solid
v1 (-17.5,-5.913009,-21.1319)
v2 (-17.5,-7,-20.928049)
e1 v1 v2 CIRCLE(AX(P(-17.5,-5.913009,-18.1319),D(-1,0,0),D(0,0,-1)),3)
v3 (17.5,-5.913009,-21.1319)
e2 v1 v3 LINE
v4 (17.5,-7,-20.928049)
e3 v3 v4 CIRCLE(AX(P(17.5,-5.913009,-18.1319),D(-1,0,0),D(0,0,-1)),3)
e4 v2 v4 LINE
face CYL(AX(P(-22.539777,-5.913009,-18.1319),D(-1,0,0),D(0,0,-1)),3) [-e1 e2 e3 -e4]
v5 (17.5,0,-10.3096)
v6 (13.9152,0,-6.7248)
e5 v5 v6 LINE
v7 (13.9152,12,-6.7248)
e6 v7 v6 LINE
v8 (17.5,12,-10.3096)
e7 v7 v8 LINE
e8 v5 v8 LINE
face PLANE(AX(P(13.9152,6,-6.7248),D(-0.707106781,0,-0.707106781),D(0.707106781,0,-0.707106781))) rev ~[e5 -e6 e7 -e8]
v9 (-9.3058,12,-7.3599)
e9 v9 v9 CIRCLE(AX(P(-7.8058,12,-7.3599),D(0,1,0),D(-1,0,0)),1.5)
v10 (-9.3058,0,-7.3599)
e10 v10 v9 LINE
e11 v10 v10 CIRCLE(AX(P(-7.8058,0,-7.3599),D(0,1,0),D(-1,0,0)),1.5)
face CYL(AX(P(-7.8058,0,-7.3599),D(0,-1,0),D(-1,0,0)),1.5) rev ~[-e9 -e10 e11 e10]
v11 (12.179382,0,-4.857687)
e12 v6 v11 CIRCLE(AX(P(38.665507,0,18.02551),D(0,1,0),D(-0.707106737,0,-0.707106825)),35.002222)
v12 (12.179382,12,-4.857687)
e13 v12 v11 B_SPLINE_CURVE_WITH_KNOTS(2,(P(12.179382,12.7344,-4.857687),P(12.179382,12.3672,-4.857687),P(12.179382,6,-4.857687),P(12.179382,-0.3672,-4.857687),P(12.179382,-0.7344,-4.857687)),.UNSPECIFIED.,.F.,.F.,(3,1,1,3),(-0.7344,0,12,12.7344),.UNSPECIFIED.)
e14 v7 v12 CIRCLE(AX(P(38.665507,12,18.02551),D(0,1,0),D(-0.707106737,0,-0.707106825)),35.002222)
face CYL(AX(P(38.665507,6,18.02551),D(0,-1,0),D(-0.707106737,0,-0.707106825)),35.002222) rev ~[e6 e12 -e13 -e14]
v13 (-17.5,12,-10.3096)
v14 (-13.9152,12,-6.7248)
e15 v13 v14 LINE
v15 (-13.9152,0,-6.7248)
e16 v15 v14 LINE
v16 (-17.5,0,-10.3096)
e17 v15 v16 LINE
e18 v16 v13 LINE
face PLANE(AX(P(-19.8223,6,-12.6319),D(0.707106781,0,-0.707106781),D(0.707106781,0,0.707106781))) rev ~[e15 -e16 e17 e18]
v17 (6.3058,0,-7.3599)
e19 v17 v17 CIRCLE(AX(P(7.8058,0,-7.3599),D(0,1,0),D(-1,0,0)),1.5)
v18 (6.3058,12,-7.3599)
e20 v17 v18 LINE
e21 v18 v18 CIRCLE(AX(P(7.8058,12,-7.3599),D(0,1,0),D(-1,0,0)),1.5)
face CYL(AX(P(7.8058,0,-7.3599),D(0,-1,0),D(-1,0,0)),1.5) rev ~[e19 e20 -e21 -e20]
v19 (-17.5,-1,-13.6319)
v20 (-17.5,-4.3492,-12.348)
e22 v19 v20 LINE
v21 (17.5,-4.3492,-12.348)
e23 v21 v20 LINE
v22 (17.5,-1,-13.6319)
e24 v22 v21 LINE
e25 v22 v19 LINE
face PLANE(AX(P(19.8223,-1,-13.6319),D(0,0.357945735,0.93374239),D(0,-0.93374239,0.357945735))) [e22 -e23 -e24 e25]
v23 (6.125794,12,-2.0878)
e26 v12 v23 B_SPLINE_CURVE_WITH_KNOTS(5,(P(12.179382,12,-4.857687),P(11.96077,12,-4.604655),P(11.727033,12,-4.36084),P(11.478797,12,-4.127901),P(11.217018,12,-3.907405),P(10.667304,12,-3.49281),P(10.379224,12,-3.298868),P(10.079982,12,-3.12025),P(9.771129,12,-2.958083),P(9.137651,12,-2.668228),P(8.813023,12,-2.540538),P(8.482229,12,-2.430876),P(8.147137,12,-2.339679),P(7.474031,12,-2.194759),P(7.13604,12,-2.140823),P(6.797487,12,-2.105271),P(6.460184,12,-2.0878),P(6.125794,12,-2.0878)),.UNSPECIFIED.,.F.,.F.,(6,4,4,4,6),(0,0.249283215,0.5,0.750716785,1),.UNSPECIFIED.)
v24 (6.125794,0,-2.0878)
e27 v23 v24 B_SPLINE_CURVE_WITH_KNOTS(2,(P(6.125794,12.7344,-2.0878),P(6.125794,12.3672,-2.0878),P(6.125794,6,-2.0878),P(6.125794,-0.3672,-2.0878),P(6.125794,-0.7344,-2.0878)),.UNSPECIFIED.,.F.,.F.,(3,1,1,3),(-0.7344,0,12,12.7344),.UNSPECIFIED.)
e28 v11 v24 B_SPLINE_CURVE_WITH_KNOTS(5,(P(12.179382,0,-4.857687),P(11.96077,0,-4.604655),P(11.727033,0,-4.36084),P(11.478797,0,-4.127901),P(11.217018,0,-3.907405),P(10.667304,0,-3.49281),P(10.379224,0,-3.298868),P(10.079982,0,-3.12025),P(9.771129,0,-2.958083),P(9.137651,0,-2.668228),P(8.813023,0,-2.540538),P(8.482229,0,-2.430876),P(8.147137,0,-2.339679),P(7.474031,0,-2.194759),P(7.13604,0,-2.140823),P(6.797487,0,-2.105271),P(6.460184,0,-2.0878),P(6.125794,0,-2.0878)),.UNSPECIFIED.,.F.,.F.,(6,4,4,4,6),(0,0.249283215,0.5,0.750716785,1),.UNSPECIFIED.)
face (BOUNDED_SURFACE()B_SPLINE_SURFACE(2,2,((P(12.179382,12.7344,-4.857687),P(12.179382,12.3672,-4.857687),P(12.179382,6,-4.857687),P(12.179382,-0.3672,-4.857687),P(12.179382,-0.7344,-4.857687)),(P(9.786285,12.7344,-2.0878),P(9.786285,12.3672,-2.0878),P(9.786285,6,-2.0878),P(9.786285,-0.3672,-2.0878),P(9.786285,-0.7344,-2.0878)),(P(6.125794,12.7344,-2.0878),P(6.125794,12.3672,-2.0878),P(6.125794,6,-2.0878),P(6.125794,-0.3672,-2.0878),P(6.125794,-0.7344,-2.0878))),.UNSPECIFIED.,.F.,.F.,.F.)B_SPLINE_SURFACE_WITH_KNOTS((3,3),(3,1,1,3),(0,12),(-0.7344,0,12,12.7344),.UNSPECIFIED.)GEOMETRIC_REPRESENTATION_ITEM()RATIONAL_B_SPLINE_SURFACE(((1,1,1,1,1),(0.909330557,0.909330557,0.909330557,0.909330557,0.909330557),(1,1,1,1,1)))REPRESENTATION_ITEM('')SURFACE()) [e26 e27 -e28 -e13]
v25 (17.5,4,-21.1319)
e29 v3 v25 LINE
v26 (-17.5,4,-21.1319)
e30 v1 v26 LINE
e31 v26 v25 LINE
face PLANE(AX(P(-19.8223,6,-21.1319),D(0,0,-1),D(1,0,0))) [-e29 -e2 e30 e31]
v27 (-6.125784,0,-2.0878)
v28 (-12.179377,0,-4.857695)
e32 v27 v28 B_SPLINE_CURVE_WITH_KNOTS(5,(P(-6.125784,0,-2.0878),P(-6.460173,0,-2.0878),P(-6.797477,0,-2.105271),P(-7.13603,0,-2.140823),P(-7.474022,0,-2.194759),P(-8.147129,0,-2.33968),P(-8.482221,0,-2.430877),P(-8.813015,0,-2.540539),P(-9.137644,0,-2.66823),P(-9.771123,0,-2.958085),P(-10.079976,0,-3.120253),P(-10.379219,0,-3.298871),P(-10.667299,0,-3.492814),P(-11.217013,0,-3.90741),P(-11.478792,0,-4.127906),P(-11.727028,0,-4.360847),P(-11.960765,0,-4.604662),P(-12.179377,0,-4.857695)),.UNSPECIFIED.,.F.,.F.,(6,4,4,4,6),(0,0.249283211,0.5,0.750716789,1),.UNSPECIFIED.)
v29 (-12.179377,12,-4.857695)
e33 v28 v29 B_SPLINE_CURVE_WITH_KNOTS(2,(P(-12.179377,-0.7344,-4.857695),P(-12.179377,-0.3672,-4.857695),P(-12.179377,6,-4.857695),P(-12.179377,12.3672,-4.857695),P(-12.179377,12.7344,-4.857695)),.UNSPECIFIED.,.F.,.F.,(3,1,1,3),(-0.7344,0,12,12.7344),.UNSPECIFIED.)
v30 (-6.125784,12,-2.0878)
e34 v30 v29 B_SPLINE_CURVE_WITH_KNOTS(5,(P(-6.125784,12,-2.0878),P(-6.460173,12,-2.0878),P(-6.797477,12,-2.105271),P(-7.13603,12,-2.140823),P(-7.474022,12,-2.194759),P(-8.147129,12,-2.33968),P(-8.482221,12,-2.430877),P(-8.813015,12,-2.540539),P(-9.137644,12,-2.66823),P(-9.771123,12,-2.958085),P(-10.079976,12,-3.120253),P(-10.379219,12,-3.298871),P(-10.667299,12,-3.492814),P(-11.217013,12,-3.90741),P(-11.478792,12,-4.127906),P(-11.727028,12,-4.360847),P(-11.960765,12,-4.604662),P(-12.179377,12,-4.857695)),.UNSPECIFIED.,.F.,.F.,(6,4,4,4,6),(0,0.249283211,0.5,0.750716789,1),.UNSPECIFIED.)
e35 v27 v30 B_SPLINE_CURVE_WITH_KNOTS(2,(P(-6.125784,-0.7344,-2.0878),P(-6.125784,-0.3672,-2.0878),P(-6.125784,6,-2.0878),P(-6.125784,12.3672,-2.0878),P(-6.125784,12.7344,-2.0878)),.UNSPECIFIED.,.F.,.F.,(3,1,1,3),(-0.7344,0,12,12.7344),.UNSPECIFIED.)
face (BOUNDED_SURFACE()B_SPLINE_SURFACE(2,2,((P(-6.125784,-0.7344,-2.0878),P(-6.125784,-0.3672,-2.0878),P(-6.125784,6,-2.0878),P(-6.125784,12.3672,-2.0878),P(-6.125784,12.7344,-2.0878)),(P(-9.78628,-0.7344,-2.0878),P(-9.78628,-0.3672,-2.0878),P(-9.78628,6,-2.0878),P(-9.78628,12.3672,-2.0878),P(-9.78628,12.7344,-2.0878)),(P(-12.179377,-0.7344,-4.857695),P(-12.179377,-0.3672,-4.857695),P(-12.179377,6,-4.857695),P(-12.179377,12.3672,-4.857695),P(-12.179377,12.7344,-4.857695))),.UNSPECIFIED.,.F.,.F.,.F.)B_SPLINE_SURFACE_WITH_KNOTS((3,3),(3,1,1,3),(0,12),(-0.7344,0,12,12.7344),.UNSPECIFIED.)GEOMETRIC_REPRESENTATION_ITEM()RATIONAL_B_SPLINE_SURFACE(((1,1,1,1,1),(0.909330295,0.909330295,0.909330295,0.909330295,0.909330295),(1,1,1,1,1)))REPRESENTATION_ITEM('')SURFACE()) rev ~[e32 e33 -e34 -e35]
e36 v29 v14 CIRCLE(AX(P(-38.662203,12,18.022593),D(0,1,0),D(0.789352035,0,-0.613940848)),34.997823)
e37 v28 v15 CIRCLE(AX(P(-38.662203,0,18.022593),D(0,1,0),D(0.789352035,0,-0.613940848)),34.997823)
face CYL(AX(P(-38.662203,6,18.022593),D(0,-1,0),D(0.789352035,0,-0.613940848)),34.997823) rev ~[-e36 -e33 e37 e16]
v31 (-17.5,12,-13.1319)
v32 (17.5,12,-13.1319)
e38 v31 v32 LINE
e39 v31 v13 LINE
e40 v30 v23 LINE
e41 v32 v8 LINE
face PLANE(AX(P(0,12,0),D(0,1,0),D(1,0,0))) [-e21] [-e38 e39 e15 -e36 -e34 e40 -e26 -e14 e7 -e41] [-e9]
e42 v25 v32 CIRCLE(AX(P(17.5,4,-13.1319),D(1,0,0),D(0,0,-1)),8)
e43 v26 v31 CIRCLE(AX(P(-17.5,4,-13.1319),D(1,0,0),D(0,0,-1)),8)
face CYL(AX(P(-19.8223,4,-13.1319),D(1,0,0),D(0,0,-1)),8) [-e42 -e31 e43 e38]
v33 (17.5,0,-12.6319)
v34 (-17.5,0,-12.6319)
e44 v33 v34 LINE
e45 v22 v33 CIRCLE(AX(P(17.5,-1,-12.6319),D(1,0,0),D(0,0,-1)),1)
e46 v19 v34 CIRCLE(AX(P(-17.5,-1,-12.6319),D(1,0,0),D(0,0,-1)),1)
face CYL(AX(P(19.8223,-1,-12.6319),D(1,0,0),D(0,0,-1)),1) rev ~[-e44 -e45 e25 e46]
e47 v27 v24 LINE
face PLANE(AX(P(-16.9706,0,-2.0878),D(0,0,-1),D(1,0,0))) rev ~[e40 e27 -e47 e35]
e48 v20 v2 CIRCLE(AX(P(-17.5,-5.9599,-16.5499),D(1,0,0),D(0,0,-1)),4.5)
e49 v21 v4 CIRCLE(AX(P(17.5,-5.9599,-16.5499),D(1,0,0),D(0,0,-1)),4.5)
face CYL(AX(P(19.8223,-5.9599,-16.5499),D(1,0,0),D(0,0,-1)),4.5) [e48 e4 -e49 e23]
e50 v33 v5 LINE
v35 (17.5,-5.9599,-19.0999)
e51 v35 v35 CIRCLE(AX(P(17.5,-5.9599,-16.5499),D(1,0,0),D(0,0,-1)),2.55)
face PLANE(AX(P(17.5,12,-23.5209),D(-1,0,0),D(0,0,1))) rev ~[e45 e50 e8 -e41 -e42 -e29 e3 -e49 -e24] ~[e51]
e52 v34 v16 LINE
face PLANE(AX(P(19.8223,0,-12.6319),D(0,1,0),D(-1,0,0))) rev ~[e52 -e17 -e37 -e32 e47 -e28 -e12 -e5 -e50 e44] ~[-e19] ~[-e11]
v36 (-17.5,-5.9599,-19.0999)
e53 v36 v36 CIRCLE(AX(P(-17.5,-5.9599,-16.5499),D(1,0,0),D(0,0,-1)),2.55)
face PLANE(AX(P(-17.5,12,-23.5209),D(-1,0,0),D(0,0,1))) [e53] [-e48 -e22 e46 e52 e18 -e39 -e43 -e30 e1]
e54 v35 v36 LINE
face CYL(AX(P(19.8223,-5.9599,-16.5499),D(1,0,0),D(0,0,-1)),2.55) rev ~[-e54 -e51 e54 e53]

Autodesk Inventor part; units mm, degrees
ref_plane "YZ Plane" through (0, 0, 0) normal (1, 0, 0) x (0, 1, 0)
ref_plane "XZ Plane" through (0, 0, 0) normal (0, 1, 0) x (-1, 0, 0)
ref_plane "XY Plane" through (0, 0, 0) normal (0, 0, 1) x (1, 0, 0)
sketch "Sketch1" plane through (0, 0, 0) normal (0, 1, 0) x (-1, 0, 0)
  circle A0 centre (-30, -5.1319) radius 1.5
  arc A1 (-31.1155, 2.2846) -> (-30, -12.6319) centre (-30, -5.1319) ccw
  arc A2 (-30, -12.6319) -> (-31.1155, 2.2846) centre (-30, -5.1319) ccw construction
  circle A3 centre (-16.9706, -0.5878) radius 1.5
  circle A4 centre (16.9706, -0.5878) radius 1.5
  circle A5 centre (16.9706, -0.5878) radius 5 construction
  line L0 (-16.9706, 4.4122) -> (-31.1155, 2.2846)
  circle A6 centre (-16.9706, -0.5878) radius 5 construction
  circle A7 centre (-7.8058, -8.4213) radius 1.55
  line L1 (0, -8.4213) -> (-15.6117, -8.4213) construction
  circle A8 centre (0, 0) radius 1.55
  line L2 (-16.9706, 4.4122) -> (16.9706, 4.4122)
  line L3 (30, -12.6319) -> (-30, -12.6319)
  circle A9 centre (30, -5.1319) radius 1.5
  line L4 (0, 4.2106) -> (0, -4.2106) construction
  line L5 (0, -4.2106) -> (0, -12.6319) construction
  line L6 (0, -4.2106) -> (3.1574, -4.2106) construction
  line L7 (0, -8.4213) -> (15.6117, -8.4213) construction
  line L8 (16.9706, 4.4122) -> (31.1155, 2.2846)
  arc A10 (31.1155, 2.2846) -> (30, -12.6319) centre (30, -5.1319) ccw construction
  arc A11 (30, -12.6319) -> (31.1155, 2.2846) centre (30, -5.1319) ccw
  circle A12 centre (7.8058, -8.4213) radius 1.55
  point P0 (0, 0)
  point P1 (0, 0)
  dimension "d0" = 10
  dimension "d1" = 10
  dimension "d2" = 15
  dimension "d3" = 15
  dimension "d4" = 3.1
  dimension "d5" = 3.1
  dimension "d6" = 3.1
sketch "Sketch2" plane through (0, 0, 0) normal (0, 1, 0) x (-1, 0, 0)
  circle A0 centre (15, 9.8681) radius 3
  circle A1 centre (16.9706, -0.5878) radius 1.5
  arc A2 (3.1574, 6.6664) -> (-3.1574, 6.6664) centre (0, 4.2106) ccw
  line L0 (3.1574, 6.6664) -> (11.0366, -3.464)
  arc A3 (11.0366, -3.464) -> (13.9152, -6.7248) centre (38.6639, 18.024) ccw
  line L1 (13.9152, -6.7248) -> (21.1612, -13.9708)
  arc A4 (30.0072, 37.5736) -> (30.286, 34.6489) centre (32.7505, 36.3595) ccw
  arc A5 (35.8309, 43.8114) -> (30.0072, 37.5736) centre (41.895, 32.3124) ccw
  circle A6 centre (25.4558, 41.8386) radius 1.5
  circle A7 centre (30, 54.8681) radius 1.5
  circle A8 centre (16.9706, 50.3239) radius 1.5
  circle A9 centre (15, 39.8681) radius 3
  circle A10 centre (24.2029, 72.4055) radius 1.5
  line L2 (27.7949, 74.3102) -> (17.0958, 107.9924)
  arc A11 (17.0958, 107.9924) -> (14.6505, 110.5406) centre (13.2835, 106.7814) ccw
  circle A12 centre (13.2835, 106.7814) radius 1.5
  line L3 (14.6505, 110.5406) -> (2.0505, 115.1224)
  circle A13 centre (-24.2029, 72.4055) radius 1.5
  arc A14 (2.0505, 115.1224) -> (-2.0505, 115.1224) centre (0, 109.4837) ccw
  line L4 (-17.0958, 107.9924) -> (-27.7949, 74.3102)
  circle A15 centre (-13.2835, 106.7814) radius 1.5
  arc A16 (-14.6505, 110.5406) -> (-17.0958, 107.9924) centre (-13.2835, 106.7814) ccw
  line L5 (-2.0505, 115.1224) -> (-14.6505, 110.5406)
  line L6 (-25.5, 17.3681) -> (-25.5, 32.3681)
  line L7 (-28.5, 32.3681) -> (-28.5, 17.3681)
  line L8 (-31, 32.3681) -> (-31, 17.3681)
  arc A17 (-28.5, 17.3681) -> (-25.5, 17.3681) centre (-27, 17.3681) ccw
  arc A18 (-31, 17.3681) -> (-30.286, 15.0873) centre (-27, 17.3681) ccw
  arc A19 (-30.0072, 37.5736) -> (-35.8309, 43.8114) centre (-41.895, 32.3124) ccw
  arc A20 (-25.5, 32.3681) -> (-28.5, 32.3681) centre (-27, 32.3681) ccw
  arc A21 (-30.286, 34.6489) -> (-31, 32.3681) centre (-27, 32.3681) ccw
  arc A22 (-30.286, 34.6489) -> (-30.0072, 37.5736) centre (-32.7505, 36.3595) ccw
  circle A23 centre (-25.4558, 41.8386) radius 1.5
  circle A24 centre (-15, 39.8681) radius 3
  circle A25 centre (-16.9706, 50.3239) radius 1.5
  arc A26 (-30.0072, 12.1625) -> (-30.286, 15.0873) centre (-32.7505, 13.3766) ccw
  arc A27 (-35.8309, 5.9248) -> (-30.0072, 12.1625) centre (-41.895, 17.4238) ccw
  arc A28 (-35.8309, 5.9248) -> (-21.1612, -13.9708) centre (-30, -5.1319) ccw
  line L9 (-21.1612, -13.9708) -> (-13.9152, -6.7248)
  circle A29 centre (-15, 9.8681) radius 3
  circle A30 centre (-25.4558, 7.8975) radius 1.5
  circle A31 centre (-16.9706, -0.5878) radius 1.5
  circle A32 centre (-30, -5.1319) radius 1.5
  line L10 (-11.0366, -3.464) -> (-3.1574, 6.6664)
  arc A33 (-13.9152, -6.7248) -> (-11.0366, -3.464) centre (-38.6639, 18.024) ccw
  line L11 (31, 17.3681) -> (31, 32.3681)
  arc A34 (28.5, 32.3681) -> (25.5, 32.3681) centre (27, 32.3681) ccw
  line L12 (25.5, 32.3681) -> (25.5, 17.3681)
  line L13 (28.5, 17.3681) -> (28.5, 32.3681)
  arc A35 (31, 32.3681) -> (30.286, 34.6489) centre (27, 32.3681) ccw
  arc A36 (-34.9925, 66.3278) -> (-27.7949, 74.3102) centre (-40.1848, 78.2458) ccw
  arc A37 (-34.9925, 66.3278) -> (-35.8309, 43.8114) centre (-30, 54.8681) ccw
  circle A38 centre (-30, 54.8681) radius 1.5
  arc A39 (30.0072, 12.1625) -> (35.8309, 5.9248) centre (41.895, 17.4238) ccw
  circle A40 centre (30, -5.1319) radius 1.5
  arc A41 (21.1612, -13.9708) -> (35.8309, 5.9248) centre (30, -5.1319) ccw
  circle A42 centre (25.4558, 7.8975) radius 1.5
  arc A43 (25.5, 17.3681) -> (28.5, 17.3681) centre (27, 17.3681) ccw
  arc A44 (30.286, 15.0873) -> (30.0072, 12.1625) centre (32.7505, 13.3766) ccw
  arc A45 (30.286, 15.0873) -> (31, 17.3681) centre (27, 17.3681) ccw
  arc A46 (35.8309, 43.8114) -> (34.9925, 66.3278) centre (30, 54.8681) ccw
  arc A47 (27.7949, 74.3102) -> (34.9925, 66.3278) centre (40.1848, 78.2458) ccw
  circle A48 centre (-30, -5.1319) radius 1.5 construction
  point P0 (0, 0)
  point P1 (0, 109.4837)
sketch "Sketch3" plane through (0, 0, 0) normal (0, 1, 0) x (-1, 0, 0)
  arc A0 (3.1574, 6.6664) -> (-3.1574, 6.6664) centre (0, 4.2106) ccw projected
  line L0 (-11.0366, -3.464) -> (-3.1574, 6.6664) projected
  line L1 (3.1574, 6.6664) -> (11.0366, -3.464) projected
  arc A1 (11.0366, -3.464) -> (13.9152, -6.7248) centre (38.6639, 18.024) ccw projected
  arc A2 (-13.9152, -6.7248) -> (-11.0366, -3.464) centre (-38.6639, 18.024) ccw projected
  line L2 (-21.1612, -13.9708) -> (-13.9152, -6.7248) projected
  line L3 (13.9152, -6.7248) -> (21.1612, -13.9708) projected
  line L4 (30, -12.6319) -> (-30, -12.6319) projected
  circle A3 centre (-7.8058, -8.4213) radius 1.55 construction
  circle A4 centre (7.8058, -8.4213) radius 1.55 construction
  circle A5 centre (0, 0) radius 1.55 projected
  circle A6 centre (-16.9706, -0.5878) radius 1.5 construction
  circle A7 centre (16.9706, -0.5878) radius 1.5 construction
  line L5 (-16.9706, -2.0878) -> (16.9706, -2.0878) construction
  line L6 (7.8058, -12.6319) -> (7.8058, -2.0878) construction
  line L7 (-7.8058, -12.6319) -> (-7.8058, -2.0878) construction
  circle A8 centre (-7.8058, -7.3599) radius 1.5
  circle A9 centre (7.8058, -7.3599) radius 1.5
  line L8 (-5.032, -12.6319) -> (-5.032, -2.0878) construction
  line L9 (-5.032, -7.3599) -> (-10.6888, -7.3599) construction
  point P0 (0, 0)
  point P1 (-19.8223, -12.6319)
  point P2 (19.8223, -12.6319)
  dimension "d38" = 3
  dimension "d39" = 3
  dimension "d42" = 10.5442
extrude "Extrusion1" add sketch "Sketch3" along normal blind 6 contours L1 A1 L3 L4 L2 A2 L0 A0 | A8 | A9
sketch "Sketch4" plane through (19.8223, 0, -12.6319) normal (0, 0, -1) x (-1, 0, 0)
  line L0 (0, 0) -> (39.6447, 0) projected
  line L1 (39.6447, 0) -> (39.6447, 6) projected
  line L2 (0, 6) -> (39.6447, 6) projected
  line L3 (0, 0) -> (0, 6) projected
  point P0 (19.8223, 0)
extrude "Extrusion2" add sketch "Sketch4" along normal blind 8.5
sketch "Sketch5" plane through (0, 0, 0) normal (0, -1, 0) x (1, 0, 0)
  line L0 (-19.8223, -21.1319) -> (19.8223, -21.1319) projected
  line L1 (19.8223, -21.1319) -> (19.8223, -13.6319)
  line L2 (19.8223, -12.6319) -> (19.8223, -21.1319) projected
  line L3 (19.8223, -13.6319) -> (-19.8223, -13.6319)
  line L4 (-19.8223, -12.6319) -> (-19.8223, -21.1319) projected
  line L5 (-19.8223, -13.6319) -> (-19.8223, -21.1319)
  line L6 (-19.8223, -21.1319) -> (19.8223, -21.1319)
  point P0 (0, 0)
  dimension "d11" = 7.5
extrude "Extrusion3" add sketch "Sketch5" along normal blind 7
sketch "Sketch6" plane through (19.8223, 6, -12.6319) normal (1, 0, 0) x (0, 0, -1)
  line L0 (0, -6) -> (0, 0) construction
  line L1 (0, -6) -> (0, -11.9599) construction
  line L2 (0, -11.9599) -> (3.918, -11.9599) construction
  circle A0 centre (3.918, -11.9599) radius 2.55
  circle A1 centre (3.918, -11.9599) radius 4.5
  line L3 (1, -6) -> (1, -13) construction
  line L4 (1, -6) -> (1, -7) construction
  line L5 (1, -7) -> (-0.2839, -10.3492)
  line L6 (1, -7) -> (1, -8.5343)
  line L7 (1, -6) -> (1, -13) projected
  point P0 (-12.6319, -6)
  dimension "d15" = 5.96
  dimension "d16" = 3.918
  dimension "d17" = 5.1
  dimension "d18" = 9
  dimension "d20" = 1
fillet "Fillet2" radius 1 1 edges at (0, 0, -13.6319)
extrude "Extrusion4" add sketch "Sketch6" against normal up to surface (39.6447 mm away) contours A1
extrude "Extrusion5" cut sketch "Sketch6" against normal up to surface (39.6447 mm away) contours A0
fillet "Fillet3" radius 3 1 edges at (0, -7, -21.1319)
extrude "Extrusion6" add sketch "Sketch6" against normal up to surface (39.6447 mm away) contours A1 L5 L6
sketch "Sketch7" plane through (0, 6, 0) normal (0, 1, 0) x (1, 0, 0)
  line L0 (-19.8223, 12.6319) -> (-13.9152, 6.7248) projected
  arc A0 (-11.0366, 3.464) -> (-13.9152, 6.7248) centre (-38.6639, -18.024) ccw projected
  line L1 (-11.0366, 3.464) -> (-3.1574, -6.6664) projected
  arc A1 (-3.1574, -6.6664) -> (3.1574, -6.6664) centre (0, -4.2106) ccw projected
  line L2 (3.1574, -6.6664) -> (11.0366, 3.464) projected
  arc A2 (13.9152, 6.7248) -> (11.0366, 3.464) centre (38.6639, -18.024) ccw projected
  line L3 (13.9152, 6.7248) -> (19.8223, 12.6319) projected
  line L4 (19.8223, 12.6319) -> (19.8223, 21.1319) projected
  line L5 (-19.8223, 21.1319) -> (19.8223, 21.1319) projected
  line L6 (-19.8223, 12.6319) -> (-19.8223, 21.1319) projected
  circle A3 centre (0, 0) radius 1.55 projected
  point P0 (0, 0)
extrude "Extrusion7" add sketch "Sketch7" along normal blind 6
fillet "Fillet4" radius 8 1 edges at (0, 12, -21.1319)
sketch "Sketch8" plane through (0, 12, 0) normal (0, 1, 0) x (1, 0, 0)
  line L0 (0, 0) -> (0, 27.291) construction
  line L1 (-0.7613, 27.291) -> (-17.5, 27.291) construction
  line L2 (0.7613, 27.291) -> (17.5, 27.291) construction
  line L3 (-17.5, 27.291) -> (-17.5, 7.1815)
  line L4 (17.5, 27.291) -> (17.5, 7.1815)
  line L5 (17.5, 7.1815) -> (23.8846, 7.1815)
  line L6 (23.8846, 7.1815) -> (23.8846, 23.5209)
  line L7 (-17.5, 7.1815) -> (-22.9652, 7.1815)
  line L8 (-22.9652, 7.1815) -> (-22.9652, 23.5209)
  line L9 (-22.9652, 23.5209) -> (23.8846, 23.5209)
  point P0 (17.5, 23.5209)
  point P1 (-17.5, 23.5209)
  dimension "d34" = 35
extrude "Extrusion8" cut sketch "Sketch8" against normal through all
sketch "Sketch9" plane through (0, 0, 0) normal (0, -1, 0) x (1, 0, 0)
  circle A0 centre (0, 0) radius 1.55 projected
  circle A1 centre (-16.9706, -0.5878) radius 1.5 projected
  circle A2 centre (16.9706, -0.5878) radius 1.5 projected
  line L0 (-16.9706, -2.0878) -> (16.9706, -2.0878)
  line L1 (16.9706, -2.0878) -> (16.9706, 15.9474)
  line L2 (16.9706, 15.9474) -> (-16.9706, 15.341)
  line L3 (-16.9706, 15.341) -> (-16.9706, -2.0878)
  point P0 (0, 0)
  point P1 (-16.9706, 0.9122)
  point P2 (16.9706, 0.9122)
extrude "Extrusion9" cut sketch "Sketch9" against normal up to surface (12 mm away) contours A1 L3 L2 L1 A2 L0
fillet "Fillet5" radius 8 2 edges at (-9.9662, 6, -2.0878) (9.9662, 6, -2.0878)
extrude "Extrusion10" cut sketch "Sketch3" along normal up to surface (12 mm away) contours A8 | A9
properties part number "prig to kauri conversion front link"
